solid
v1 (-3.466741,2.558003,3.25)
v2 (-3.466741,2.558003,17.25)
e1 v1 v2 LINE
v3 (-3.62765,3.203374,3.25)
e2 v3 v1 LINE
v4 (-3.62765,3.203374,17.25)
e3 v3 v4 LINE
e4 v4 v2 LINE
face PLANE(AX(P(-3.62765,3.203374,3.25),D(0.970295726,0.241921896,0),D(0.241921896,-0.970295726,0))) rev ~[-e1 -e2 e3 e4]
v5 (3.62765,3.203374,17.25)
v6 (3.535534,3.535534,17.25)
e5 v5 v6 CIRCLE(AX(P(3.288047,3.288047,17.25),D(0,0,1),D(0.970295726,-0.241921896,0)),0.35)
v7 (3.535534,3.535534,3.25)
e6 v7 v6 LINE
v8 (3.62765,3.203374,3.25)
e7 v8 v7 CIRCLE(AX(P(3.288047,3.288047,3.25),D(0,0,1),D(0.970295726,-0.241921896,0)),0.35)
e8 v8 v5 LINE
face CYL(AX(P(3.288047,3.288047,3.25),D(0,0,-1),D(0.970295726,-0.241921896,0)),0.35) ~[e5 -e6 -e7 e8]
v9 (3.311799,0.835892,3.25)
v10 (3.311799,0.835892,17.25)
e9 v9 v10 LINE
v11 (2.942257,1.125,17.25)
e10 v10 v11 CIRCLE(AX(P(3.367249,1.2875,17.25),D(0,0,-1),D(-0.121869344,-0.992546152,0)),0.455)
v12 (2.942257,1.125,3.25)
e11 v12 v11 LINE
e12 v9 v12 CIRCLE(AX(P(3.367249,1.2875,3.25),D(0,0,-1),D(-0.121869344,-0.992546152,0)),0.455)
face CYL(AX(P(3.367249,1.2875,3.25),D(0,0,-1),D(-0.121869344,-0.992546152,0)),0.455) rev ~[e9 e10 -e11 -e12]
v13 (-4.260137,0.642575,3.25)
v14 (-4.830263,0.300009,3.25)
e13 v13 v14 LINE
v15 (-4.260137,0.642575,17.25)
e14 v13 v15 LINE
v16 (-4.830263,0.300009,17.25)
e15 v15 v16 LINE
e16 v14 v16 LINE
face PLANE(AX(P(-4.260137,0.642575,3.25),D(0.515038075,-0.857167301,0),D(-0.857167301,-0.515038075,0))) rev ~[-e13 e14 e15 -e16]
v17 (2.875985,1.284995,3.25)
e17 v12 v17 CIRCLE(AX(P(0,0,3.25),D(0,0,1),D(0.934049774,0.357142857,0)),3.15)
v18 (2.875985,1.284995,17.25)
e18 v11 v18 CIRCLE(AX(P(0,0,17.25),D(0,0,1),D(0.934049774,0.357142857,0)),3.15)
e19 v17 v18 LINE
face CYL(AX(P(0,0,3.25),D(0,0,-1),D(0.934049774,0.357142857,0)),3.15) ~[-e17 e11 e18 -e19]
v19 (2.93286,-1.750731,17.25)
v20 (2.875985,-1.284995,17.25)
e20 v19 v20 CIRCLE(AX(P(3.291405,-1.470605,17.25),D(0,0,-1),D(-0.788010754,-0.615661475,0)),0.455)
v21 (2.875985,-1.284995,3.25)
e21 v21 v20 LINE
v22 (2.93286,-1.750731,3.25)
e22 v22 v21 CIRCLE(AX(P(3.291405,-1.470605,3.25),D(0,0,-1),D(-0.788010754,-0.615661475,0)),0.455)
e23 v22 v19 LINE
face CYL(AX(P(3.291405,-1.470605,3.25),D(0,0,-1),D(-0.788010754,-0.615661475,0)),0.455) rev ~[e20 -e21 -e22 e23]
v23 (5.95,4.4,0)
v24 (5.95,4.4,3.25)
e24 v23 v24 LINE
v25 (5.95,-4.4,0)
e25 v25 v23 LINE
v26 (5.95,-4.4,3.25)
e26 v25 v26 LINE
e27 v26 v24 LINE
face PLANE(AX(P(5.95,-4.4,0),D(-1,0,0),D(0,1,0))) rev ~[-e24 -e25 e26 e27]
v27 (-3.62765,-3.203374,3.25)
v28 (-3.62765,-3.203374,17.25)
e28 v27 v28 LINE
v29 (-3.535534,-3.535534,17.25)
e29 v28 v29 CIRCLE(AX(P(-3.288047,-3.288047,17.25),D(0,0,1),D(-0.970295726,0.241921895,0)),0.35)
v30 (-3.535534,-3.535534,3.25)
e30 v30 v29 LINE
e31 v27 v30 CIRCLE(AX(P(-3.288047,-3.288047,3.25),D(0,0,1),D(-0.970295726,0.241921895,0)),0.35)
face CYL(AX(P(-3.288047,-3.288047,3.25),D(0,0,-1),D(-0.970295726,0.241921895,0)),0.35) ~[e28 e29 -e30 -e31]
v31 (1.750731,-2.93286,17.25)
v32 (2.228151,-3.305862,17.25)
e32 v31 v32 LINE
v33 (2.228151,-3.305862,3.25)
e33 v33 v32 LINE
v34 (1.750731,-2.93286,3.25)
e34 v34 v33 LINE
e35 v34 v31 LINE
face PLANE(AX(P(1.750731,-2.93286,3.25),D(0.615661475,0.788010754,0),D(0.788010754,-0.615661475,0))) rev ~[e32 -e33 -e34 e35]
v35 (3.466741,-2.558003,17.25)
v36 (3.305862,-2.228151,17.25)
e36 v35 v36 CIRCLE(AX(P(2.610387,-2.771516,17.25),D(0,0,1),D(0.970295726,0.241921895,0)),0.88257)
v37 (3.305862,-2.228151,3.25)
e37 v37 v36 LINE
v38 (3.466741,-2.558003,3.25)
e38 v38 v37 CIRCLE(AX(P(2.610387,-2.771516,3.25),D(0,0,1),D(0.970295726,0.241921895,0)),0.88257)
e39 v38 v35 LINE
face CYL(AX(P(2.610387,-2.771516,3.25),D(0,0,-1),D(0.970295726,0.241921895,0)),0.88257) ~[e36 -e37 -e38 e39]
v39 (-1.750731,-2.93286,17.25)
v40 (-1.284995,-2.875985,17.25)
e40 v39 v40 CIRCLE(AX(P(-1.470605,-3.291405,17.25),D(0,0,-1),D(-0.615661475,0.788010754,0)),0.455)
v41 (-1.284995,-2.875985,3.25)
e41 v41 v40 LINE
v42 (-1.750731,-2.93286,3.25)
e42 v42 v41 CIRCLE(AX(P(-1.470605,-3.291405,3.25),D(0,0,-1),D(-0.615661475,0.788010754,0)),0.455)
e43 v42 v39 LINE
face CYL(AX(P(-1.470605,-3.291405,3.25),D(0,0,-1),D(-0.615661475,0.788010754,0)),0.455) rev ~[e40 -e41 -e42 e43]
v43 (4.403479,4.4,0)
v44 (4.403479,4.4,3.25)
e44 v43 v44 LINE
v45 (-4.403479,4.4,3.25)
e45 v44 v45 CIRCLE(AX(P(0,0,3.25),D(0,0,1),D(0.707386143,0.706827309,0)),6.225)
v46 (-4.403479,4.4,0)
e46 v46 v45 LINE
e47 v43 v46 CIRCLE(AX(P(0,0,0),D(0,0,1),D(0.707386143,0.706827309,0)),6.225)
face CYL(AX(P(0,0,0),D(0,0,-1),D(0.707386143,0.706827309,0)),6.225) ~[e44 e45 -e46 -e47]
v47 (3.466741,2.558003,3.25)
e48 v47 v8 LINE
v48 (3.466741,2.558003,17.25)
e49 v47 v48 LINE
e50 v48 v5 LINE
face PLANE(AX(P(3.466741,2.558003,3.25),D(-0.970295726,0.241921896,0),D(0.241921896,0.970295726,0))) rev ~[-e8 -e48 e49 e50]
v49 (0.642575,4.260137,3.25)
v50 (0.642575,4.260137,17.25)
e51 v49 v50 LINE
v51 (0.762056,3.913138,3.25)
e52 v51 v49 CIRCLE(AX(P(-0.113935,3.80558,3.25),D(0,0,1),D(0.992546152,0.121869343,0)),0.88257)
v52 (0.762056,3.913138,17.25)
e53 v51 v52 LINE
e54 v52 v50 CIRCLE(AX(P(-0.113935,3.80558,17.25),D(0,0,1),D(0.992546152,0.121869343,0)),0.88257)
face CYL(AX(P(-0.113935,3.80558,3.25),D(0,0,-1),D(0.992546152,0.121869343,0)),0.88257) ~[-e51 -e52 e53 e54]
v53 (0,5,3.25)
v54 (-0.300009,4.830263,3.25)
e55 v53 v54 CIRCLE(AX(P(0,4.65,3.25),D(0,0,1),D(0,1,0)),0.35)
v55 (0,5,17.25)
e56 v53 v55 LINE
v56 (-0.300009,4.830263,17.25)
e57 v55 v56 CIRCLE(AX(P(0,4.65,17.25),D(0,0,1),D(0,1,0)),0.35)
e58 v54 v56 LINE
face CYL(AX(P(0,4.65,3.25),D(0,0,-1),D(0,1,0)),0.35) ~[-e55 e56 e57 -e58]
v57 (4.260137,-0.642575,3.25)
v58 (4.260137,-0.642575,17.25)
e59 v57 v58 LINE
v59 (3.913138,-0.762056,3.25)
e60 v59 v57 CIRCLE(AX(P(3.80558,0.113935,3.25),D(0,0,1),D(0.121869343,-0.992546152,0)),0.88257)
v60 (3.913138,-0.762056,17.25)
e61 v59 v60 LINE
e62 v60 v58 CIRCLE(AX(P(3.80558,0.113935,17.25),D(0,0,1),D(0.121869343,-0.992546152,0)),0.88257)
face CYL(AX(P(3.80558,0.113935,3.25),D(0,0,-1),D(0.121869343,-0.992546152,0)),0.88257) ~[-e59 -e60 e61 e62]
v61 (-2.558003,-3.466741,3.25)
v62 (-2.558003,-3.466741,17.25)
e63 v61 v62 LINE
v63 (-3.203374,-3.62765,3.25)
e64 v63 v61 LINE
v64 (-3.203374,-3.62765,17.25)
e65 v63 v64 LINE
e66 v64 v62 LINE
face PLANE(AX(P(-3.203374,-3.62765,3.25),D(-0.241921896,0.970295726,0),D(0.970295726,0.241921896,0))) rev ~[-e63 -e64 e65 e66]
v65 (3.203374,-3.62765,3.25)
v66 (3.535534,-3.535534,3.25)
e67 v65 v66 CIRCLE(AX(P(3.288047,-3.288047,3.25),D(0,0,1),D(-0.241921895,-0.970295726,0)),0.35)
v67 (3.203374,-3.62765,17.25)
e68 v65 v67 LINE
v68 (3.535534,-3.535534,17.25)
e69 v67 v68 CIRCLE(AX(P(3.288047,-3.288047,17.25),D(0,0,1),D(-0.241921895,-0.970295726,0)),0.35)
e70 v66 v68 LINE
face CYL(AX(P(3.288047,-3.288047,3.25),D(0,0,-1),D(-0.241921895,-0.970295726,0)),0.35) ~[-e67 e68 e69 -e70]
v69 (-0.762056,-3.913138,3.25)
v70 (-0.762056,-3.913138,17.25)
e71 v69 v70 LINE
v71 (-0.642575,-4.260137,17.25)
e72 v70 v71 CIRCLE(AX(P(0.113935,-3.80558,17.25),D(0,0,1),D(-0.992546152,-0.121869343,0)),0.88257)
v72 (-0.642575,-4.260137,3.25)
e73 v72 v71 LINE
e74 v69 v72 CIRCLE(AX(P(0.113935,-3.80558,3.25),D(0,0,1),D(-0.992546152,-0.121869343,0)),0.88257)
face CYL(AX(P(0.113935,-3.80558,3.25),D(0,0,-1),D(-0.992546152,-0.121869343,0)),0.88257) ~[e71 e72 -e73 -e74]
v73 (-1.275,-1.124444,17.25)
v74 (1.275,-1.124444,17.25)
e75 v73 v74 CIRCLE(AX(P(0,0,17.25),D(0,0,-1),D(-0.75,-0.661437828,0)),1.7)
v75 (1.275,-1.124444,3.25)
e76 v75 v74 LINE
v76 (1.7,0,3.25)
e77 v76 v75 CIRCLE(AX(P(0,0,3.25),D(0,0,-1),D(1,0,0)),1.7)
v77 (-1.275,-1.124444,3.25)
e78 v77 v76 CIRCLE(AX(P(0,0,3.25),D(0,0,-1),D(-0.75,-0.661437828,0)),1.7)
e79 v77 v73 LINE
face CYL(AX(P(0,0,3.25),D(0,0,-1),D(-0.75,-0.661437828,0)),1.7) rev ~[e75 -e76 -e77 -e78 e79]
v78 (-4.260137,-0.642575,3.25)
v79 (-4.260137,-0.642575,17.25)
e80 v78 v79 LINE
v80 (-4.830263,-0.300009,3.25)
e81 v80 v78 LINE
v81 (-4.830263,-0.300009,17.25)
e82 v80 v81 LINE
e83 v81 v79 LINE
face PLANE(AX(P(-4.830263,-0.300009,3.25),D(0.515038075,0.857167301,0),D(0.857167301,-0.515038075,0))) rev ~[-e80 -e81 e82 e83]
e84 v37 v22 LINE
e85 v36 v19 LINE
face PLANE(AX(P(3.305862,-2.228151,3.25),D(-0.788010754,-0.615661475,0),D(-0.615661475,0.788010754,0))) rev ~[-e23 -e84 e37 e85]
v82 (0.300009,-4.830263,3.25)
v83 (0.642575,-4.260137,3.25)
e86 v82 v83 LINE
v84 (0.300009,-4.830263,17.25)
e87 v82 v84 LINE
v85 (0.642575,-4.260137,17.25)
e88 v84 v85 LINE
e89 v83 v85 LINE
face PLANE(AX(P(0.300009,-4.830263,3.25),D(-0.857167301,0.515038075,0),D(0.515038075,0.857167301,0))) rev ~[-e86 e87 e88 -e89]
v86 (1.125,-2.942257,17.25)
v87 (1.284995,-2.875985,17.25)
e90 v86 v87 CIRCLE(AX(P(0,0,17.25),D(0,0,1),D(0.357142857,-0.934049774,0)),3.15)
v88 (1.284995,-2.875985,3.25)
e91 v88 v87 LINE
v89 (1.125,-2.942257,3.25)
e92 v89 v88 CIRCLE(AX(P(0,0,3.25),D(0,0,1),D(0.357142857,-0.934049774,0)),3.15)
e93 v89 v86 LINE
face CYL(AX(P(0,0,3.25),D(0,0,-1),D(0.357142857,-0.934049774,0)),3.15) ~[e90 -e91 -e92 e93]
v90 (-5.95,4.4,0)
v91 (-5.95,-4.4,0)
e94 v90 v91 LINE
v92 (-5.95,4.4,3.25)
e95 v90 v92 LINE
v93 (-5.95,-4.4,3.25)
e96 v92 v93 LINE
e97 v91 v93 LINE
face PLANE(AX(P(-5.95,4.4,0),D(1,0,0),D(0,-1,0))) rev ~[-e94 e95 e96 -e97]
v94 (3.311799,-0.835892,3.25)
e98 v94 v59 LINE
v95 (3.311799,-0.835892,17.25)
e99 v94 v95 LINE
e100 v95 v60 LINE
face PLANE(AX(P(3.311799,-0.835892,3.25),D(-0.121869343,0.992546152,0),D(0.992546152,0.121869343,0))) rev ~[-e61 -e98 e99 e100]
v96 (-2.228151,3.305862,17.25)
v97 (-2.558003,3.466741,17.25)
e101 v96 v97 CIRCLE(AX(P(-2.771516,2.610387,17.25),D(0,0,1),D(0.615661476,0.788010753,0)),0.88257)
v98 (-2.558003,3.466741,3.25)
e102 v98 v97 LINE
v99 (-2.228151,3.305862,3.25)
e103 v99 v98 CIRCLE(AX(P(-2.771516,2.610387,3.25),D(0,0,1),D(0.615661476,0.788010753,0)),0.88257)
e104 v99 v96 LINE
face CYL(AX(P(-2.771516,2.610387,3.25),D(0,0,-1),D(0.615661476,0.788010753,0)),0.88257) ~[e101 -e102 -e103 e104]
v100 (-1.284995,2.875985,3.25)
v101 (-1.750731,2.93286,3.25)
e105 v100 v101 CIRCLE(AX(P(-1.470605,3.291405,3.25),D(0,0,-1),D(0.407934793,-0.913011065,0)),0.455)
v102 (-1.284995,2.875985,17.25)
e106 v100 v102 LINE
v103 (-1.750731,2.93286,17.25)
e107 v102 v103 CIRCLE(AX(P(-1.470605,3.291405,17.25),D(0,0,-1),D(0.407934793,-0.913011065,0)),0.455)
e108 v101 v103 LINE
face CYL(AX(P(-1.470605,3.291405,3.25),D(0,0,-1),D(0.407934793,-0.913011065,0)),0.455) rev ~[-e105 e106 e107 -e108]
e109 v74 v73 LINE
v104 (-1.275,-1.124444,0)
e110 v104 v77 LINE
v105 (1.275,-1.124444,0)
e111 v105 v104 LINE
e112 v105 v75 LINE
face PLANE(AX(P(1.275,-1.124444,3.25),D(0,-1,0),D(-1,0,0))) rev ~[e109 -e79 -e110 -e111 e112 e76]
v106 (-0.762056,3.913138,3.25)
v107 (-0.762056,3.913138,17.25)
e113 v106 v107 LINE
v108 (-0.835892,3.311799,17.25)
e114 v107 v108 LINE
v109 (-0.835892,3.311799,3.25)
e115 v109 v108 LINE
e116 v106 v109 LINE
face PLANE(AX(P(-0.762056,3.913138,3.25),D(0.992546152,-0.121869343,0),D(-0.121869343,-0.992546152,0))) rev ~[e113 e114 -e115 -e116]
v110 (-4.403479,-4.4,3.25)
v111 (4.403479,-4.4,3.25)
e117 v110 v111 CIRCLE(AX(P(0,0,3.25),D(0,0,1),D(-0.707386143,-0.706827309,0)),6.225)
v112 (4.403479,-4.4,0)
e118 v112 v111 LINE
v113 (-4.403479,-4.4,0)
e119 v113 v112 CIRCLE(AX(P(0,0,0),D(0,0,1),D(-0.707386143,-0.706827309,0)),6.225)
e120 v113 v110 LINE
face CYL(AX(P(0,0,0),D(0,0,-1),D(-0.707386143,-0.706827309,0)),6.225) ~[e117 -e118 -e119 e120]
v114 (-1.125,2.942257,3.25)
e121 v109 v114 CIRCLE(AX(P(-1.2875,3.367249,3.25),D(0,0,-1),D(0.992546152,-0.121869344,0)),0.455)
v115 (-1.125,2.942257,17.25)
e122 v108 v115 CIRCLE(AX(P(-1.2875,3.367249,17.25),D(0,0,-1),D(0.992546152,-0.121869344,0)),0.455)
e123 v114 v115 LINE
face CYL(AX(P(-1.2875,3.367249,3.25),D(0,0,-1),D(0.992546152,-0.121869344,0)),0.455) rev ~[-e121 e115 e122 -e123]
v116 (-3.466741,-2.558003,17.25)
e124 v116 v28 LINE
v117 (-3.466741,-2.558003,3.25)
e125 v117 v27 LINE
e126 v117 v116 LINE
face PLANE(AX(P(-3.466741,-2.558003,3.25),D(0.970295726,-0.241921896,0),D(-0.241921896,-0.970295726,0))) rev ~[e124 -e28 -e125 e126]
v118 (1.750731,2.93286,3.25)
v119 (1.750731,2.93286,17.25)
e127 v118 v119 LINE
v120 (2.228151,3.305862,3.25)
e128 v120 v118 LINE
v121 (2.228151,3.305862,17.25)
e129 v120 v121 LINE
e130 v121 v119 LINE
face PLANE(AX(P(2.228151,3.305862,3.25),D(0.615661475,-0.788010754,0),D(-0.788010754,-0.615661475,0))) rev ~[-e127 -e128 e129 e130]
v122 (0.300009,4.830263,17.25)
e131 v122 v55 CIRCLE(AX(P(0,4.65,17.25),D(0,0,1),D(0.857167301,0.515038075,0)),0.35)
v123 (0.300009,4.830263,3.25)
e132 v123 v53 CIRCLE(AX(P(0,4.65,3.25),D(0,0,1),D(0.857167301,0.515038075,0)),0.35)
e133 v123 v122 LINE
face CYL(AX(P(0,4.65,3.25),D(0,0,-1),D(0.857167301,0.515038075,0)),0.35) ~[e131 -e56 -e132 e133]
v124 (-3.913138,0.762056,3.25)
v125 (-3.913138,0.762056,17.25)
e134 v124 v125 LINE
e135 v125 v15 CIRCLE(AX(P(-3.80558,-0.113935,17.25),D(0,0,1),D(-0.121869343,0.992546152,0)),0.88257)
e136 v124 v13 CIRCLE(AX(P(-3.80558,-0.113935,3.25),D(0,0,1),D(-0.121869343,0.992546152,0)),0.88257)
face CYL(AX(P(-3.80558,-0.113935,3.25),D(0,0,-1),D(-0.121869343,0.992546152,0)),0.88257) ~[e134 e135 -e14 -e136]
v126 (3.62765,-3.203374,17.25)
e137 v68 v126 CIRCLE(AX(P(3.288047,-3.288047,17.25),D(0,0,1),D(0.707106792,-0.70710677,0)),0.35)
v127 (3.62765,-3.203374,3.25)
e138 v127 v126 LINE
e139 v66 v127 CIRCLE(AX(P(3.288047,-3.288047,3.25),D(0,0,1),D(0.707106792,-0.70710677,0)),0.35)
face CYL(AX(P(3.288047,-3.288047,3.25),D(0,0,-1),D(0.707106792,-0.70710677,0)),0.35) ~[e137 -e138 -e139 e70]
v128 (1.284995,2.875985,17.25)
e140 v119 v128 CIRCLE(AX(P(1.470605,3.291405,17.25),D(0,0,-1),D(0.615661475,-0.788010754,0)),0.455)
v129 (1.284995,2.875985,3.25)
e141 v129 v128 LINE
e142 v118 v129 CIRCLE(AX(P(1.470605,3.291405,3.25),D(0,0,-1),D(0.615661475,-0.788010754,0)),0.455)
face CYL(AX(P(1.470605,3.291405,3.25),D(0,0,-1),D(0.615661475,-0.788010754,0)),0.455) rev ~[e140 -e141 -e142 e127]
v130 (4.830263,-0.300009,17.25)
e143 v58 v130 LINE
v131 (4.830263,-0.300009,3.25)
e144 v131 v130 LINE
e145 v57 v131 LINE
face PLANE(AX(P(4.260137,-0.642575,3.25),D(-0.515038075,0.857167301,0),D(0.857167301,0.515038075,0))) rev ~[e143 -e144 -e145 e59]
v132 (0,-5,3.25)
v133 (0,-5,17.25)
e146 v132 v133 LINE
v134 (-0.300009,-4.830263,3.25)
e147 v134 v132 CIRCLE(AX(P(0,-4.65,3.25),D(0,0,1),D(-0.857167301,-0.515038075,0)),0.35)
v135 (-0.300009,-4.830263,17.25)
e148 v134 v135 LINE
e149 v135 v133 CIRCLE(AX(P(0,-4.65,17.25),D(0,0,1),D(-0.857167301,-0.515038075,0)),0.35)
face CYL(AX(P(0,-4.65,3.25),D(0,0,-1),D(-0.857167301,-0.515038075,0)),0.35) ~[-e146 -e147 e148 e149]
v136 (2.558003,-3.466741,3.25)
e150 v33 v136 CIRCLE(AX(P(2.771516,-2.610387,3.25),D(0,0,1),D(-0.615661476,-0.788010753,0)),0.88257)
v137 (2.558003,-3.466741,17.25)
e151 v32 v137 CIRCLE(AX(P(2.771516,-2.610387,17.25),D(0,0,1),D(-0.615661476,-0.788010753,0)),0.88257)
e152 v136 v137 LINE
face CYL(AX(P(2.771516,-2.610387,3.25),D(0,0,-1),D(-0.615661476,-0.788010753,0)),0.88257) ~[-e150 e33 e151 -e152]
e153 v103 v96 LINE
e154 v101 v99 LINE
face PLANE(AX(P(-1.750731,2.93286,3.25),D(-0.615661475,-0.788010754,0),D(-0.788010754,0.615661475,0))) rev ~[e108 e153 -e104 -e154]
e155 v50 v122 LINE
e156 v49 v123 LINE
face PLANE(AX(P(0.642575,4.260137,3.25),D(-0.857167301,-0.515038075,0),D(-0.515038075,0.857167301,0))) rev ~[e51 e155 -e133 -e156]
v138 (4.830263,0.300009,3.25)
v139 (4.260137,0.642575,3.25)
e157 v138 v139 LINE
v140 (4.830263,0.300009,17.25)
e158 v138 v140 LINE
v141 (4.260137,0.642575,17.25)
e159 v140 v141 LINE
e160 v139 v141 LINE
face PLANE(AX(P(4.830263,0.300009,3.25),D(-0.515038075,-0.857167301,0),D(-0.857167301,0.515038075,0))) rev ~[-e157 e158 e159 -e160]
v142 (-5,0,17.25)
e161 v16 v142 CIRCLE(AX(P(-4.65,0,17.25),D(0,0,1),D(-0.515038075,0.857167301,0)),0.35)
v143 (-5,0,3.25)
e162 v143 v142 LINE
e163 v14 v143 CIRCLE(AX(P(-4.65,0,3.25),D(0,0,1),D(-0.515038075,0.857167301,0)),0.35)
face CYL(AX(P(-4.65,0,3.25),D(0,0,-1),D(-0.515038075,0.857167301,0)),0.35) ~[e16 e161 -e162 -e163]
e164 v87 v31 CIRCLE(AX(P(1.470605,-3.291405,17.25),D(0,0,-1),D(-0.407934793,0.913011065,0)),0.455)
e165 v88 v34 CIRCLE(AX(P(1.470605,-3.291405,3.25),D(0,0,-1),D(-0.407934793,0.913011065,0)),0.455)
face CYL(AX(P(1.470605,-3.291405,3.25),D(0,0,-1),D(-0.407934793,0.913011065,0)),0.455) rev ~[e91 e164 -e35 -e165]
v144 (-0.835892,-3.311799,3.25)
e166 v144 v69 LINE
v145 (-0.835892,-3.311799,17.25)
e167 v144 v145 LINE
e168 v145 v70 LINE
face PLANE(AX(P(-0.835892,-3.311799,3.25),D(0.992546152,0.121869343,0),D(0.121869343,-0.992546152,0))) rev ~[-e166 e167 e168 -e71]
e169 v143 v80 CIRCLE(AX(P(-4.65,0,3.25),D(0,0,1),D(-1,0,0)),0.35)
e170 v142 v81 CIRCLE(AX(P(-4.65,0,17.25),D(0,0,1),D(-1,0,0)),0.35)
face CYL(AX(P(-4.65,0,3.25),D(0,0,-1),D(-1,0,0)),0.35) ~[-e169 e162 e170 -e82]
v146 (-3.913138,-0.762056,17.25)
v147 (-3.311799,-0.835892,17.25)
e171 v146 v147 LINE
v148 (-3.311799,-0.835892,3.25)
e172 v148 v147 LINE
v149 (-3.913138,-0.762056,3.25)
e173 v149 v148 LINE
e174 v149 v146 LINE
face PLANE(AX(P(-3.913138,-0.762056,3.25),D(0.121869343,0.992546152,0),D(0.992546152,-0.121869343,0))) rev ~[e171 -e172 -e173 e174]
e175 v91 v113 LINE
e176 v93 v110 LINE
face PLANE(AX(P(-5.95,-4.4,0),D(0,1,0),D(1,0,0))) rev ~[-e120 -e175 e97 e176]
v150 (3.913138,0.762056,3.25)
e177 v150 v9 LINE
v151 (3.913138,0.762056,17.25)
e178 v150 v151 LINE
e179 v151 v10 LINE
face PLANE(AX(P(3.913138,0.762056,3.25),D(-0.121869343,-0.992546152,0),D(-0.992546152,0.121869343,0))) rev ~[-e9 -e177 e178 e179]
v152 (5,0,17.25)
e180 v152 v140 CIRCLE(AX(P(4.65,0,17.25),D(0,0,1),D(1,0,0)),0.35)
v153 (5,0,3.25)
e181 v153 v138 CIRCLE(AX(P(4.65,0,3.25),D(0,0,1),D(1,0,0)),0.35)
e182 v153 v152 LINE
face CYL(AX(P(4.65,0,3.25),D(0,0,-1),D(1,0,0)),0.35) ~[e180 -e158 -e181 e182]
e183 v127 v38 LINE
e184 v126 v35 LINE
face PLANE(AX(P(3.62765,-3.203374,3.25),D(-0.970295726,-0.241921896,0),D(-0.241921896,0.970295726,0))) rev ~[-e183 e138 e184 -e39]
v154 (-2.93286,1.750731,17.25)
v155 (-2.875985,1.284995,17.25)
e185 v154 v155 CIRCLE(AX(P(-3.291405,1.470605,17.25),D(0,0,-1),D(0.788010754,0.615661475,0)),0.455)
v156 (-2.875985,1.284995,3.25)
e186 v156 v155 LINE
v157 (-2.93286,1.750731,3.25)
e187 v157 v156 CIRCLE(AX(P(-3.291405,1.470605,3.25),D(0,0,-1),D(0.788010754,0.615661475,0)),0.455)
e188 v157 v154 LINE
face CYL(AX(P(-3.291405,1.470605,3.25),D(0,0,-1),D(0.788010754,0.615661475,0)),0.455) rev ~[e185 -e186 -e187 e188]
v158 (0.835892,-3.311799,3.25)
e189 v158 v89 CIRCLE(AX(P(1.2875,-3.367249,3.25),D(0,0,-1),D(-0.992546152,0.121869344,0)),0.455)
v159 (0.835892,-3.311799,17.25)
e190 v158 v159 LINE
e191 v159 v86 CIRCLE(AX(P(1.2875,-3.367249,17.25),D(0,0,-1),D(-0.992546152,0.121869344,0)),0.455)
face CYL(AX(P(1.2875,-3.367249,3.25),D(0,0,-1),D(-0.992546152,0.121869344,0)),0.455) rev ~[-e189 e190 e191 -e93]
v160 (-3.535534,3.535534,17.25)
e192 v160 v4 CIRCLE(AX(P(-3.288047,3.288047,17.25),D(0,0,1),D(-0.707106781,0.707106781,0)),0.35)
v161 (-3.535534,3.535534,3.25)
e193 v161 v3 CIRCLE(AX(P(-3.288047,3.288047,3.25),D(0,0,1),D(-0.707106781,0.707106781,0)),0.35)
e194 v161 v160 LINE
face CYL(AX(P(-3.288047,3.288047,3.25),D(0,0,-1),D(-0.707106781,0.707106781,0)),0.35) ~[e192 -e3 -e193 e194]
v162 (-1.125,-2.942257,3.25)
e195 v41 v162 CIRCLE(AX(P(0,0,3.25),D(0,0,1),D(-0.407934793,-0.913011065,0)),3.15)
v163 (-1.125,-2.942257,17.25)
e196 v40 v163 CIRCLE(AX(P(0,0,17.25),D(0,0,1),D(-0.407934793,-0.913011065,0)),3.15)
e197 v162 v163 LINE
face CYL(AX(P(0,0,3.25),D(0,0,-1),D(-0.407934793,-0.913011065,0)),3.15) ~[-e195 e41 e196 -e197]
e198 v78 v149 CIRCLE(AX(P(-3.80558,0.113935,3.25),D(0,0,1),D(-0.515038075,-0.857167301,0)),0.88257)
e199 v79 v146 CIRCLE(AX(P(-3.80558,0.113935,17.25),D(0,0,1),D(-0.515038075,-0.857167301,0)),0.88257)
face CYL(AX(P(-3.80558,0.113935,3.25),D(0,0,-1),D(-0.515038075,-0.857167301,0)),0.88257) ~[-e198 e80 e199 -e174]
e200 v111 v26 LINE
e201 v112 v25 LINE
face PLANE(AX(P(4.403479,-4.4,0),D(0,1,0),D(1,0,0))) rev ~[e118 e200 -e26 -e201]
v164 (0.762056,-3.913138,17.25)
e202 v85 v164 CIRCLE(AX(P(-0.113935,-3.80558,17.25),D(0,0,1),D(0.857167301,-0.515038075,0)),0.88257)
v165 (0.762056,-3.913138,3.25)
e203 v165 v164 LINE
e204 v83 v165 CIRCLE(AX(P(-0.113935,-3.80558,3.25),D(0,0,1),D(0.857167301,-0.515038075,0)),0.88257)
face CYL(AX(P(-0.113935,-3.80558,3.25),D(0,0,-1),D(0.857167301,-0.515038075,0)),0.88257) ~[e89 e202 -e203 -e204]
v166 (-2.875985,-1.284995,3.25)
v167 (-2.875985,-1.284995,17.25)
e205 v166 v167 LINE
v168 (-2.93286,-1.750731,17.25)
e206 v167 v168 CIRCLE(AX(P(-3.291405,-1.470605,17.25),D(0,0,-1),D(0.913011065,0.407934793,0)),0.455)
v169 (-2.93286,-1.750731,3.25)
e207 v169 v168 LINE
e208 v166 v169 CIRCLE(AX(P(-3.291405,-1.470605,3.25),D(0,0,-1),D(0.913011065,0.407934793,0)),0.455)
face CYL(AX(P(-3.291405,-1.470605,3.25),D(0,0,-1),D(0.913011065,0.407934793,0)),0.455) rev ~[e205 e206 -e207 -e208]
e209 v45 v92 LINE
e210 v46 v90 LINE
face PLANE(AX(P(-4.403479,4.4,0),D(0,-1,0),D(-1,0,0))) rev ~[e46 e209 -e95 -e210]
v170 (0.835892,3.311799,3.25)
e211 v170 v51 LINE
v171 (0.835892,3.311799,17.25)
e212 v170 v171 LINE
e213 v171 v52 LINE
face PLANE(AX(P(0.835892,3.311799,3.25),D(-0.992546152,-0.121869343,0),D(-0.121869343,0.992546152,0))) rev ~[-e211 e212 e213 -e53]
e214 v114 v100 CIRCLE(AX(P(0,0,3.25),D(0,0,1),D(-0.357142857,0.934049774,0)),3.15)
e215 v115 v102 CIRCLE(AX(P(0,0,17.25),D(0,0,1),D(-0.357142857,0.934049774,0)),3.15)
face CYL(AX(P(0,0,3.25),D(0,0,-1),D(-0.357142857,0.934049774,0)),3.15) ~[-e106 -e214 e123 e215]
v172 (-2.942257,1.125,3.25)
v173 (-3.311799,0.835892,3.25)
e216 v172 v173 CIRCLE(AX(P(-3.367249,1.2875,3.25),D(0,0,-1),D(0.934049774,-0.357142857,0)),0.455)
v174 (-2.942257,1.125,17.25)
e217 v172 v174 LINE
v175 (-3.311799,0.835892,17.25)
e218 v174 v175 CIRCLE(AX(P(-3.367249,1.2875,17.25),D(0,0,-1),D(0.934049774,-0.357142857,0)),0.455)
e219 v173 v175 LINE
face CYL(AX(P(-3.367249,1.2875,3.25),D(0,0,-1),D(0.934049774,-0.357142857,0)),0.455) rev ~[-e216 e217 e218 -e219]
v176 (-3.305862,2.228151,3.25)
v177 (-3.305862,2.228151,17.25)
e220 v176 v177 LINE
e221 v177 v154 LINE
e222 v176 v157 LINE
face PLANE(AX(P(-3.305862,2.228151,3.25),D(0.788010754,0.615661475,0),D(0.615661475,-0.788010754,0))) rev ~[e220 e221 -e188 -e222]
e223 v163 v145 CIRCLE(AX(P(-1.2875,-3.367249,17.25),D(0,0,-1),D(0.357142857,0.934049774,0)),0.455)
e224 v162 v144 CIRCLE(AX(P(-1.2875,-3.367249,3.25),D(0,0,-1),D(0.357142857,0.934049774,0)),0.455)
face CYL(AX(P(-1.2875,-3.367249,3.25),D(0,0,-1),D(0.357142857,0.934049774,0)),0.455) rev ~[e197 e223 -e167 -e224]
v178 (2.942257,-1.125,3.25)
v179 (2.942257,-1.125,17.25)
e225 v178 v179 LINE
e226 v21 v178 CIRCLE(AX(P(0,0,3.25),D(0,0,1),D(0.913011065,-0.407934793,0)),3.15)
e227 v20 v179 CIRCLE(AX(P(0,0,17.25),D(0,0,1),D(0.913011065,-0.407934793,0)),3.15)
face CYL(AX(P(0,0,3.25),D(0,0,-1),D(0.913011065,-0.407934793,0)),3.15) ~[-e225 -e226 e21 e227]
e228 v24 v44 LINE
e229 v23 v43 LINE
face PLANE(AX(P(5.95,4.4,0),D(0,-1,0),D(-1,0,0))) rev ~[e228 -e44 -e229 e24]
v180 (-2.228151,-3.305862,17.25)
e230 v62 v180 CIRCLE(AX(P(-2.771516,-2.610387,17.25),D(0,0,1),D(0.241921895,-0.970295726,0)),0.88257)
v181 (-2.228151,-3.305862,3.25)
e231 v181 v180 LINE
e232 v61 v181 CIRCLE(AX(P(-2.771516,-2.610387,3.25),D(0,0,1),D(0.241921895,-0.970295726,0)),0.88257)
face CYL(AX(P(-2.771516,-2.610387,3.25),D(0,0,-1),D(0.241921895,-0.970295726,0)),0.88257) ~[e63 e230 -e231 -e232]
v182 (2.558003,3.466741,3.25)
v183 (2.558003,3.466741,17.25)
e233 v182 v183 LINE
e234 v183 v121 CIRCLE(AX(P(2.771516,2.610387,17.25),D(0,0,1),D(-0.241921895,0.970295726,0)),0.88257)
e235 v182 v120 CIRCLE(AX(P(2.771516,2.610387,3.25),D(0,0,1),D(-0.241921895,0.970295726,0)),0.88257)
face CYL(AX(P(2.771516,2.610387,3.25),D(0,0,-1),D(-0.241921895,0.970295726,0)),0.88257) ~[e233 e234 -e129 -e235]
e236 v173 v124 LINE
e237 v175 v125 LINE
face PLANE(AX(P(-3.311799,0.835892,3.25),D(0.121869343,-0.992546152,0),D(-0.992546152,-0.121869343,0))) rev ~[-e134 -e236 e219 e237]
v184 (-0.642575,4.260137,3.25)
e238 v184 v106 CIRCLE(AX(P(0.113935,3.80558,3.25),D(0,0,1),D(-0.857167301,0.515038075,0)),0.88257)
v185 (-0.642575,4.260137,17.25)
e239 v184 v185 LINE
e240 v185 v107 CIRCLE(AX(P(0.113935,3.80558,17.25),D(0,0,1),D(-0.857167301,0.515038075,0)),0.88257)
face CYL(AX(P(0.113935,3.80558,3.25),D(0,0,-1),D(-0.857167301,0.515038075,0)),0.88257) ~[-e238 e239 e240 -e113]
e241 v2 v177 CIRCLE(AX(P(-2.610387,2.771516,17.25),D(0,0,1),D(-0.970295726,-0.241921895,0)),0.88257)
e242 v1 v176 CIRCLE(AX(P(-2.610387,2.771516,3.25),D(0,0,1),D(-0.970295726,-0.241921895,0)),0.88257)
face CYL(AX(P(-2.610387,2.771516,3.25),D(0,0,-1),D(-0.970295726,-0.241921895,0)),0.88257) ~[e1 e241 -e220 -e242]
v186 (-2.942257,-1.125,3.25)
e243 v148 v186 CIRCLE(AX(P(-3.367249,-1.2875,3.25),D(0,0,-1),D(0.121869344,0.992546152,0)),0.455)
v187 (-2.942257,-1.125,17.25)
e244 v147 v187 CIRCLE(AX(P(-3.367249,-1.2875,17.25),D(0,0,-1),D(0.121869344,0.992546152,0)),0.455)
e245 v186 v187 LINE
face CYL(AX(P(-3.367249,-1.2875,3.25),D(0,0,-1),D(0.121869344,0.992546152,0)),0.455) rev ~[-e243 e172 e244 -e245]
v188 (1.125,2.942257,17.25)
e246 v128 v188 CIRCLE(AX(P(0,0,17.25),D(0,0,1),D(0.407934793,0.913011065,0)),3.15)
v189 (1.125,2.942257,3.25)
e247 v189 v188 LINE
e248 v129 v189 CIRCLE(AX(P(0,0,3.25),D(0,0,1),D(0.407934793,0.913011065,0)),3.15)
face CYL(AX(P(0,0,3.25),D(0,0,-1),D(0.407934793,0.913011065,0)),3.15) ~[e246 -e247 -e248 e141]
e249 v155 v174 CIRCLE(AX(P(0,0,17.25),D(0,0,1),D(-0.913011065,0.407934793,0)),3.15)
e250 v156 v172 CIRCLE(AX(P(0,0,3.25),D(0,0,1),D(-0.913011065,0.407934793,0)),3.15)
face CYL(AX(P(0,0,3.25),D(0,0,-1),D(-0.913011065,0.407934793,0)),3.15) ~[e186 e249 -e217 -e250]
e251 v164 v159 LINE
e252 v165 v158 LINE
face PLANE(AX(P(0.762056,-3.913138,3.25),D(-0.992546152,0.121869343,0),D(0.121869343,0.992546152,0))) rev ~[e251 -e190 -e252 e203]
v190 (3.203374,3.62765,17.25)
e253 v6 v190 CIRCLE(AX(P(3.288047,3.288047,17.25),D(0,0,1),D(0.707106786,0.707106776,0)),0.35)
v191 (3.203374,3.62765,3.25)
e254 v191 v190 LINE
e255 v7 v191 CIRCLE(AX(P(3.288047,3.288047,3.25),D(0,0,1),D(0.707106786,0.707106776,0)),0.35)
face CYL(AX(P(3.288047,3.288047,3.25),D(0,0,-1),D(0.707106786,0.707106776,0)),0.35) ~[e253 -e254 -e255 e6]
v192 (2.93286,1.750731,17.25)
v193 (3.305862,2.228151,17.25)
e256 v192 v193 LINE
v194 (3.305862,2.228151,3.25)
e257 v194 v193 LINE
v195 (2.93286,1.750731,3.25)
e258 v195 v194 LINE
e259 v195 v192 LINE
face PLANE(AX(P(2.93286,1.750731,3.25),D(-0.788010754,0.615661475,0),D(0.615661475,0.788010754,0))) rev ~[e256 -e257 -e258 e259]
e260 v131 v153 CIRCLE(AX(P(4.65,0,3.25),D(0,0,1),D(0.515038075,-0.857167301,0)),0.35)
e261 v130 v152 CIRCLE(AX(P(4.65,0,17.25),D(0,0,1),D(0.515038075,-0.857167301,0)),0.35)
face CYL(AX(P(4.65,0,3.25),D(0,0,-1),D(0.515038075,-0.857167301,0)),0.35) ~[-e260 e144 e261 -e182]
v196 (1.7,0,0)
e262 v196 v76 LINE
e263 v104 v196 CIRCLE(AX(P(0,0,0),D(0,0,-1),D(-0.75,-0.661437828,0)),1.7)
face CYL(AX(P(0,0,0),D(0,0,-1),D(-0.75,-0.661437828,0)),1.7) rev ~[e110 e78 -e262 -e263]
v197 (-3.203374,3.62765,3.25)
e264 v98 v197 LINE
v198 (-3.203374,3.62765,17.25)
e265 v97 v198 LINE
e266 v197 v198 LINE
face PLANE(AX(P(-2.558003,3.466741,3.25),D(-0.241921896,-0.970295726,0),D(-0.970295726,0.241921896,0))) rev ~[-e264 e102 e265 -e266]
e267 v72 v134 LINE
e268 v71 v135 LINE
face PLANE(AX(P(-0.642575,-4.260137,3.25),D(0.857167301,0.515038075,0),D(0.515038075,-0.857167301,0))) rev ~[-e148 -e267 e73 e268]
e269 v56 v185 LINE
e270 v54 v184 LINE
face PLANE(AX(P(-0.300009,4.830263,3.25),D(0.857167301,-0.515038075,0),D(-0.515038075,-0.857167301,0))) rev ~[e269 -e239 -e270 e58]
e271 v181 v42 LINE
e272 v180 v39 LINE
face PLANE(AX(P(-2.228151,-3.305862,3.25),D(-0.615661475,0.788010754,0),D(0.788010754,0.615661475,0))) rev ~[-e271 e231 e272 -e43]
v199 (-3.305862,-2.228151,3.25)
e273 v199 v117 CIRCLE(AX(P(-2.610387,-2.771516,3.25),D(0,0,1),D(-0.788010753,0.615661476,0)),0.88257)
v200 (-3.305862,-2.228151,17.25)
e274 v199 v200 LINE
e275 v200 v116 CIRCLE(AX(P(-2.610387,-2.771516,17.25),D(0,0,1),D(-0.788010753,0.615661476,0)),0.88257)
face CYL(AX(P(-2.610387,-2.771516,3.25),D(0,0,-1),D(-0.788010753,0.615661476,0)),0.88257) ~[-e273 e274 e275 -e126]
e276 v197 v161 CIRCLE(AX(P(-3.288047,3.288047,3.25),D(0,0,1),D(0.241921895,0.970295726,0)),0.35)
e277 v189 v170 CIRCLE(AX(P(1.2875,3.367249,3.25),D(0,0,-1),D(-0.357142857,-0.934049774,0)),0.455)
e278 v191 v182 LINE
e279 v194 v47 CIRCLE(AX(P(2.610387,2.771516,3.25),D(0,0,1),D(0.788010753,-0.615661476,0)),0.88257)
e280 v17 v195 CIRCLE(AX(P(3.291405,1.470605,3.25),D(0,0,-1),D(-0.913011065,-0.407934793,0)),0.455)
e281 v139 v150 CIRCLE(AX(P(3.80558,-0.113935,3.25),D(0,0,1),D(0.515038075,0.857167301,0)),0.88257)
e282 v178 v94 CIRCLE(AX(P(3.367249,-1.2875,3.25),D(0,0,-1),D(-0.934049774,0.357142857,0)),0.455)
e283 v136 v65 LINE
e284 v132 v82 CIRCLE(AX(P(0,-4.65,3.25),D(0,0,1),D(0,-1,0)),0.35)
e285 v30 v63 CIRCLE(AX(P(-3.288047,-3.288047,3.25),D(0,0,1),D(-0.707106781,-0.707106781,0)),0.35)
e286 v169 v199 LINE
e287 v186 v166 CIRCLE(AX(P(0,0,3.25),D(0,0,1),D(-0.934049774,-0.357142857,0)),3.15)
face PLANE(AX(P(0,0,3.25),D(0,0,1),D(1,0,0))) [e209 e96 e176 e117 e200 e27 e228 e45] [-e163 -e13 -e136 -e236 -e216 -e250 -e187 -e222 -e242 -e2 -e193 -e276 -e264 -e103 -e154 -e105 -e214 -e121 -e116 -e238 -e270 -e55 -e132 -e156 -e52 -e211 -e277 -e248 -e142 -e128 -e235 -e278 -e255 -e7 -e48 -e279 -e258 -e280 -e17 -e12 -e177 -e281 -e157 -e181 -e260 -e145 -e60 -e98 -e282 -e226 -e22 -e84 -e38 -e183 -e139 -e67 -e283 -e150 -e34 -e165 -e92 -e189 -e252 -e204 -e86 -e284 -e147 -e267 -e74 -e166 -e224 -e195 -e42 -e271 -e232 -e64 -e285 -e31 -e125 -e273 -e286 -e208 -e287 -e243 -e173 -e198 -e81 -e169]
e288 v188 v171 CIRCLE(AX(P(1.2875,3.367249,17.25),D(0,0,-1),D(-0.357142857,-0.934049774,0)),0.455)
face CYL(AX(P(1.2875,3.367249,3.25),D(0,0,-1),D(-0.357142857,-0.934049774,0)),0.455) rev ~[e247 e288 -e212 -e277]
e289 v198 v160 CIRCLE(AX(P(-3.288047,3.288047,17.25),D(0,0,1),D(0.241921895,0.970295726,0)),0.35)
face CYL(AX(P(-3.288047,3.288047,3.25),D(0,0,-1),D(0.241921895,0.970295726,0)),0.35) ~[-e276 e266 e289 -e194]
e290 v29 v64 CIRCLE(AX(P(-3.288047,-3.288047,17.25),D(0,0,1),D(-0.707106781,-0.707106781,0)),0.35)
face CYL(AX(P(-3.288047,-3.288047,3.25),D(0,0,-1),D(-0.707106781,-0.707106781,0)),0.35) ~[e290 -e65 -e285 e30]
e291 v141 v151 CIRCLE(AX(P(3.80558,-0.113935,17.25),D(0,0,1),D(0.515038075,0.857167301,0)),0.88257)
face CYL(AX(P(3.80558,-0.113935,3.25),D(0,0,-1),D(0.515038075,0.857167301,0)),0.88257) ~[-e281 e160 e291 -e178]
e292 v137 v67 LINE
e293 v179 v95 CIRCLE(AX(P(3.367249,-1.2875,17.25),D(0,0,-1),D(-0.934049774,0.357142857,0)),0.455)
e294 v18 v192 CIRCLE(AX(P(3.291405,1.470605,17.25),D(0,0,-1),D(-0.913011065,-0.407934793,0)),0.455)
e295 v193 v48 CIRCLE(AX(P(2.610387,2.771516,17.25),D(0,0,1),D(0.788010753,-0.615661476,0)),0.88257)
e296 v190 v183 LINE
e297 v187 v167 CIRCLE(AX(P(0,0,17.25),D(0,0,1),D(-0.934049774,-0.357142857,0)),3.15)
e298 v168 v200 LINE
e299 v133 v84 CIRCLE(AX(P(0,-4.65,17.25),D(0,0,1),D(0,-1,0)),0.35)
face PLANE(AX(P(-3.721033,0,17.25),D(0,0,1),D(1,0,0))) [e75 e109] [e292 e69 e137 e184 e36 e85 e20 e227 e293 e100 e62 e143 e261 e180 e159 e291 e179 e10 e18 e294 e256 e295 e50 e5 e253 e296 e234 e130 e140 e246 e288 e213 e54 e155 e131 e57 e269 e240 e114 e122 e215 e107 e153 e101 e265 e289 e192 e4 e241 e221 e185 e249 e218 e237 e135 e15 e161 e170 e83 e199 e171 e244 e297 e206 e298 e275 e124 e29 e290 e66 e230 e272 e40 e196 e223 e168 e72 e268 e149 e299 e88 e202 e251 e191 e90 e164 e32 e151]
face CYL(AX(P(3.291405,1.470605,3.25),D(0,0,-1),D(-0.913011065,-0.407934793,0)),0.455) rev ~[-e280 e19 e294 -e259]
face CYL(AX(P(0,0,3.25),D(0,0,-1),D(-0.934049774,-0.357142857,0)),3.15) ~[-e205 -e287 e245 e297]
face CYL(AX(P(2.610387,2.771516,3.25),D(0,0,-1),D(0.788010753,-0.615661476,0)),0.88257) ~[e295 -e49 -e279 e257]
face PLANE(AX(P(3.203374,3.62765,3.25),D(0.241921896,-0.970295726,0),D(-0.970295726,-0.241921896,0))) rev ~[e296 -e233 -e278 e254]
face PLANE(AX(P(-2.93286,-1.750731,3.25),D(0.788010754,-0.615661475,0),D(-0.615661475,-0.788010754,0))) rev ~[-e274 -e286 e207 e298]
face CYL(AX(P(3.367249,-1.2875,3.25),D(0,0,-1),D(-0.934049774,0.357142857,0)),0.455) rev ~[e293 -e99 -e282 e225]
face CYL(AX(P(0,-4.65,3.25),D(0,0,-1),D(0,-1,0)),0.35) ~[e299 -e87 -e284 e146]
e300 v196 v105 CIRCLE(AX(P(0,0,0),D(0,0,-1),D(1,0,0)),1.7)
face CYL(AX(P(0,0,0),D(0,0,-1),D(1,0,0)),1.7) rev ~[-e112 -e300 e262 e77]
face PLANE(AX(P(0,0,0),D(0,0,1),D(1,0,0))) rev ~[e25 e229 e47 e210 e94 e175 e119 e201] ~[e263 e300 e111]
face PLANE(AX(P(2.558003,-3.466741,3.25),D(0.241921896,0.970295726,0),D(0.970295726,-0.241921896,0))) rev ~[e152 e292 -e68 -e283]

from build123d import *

# Parameters (mm, degrees)
F0_R     = 5
F0_R_2   = 3.15
F0_R_3   = 2.55
F1_DEPTH = 3.25
F2_R     = 2.55
F3_DEPTH = 14


# Not quite as in the source:
# - a feature names something its author has since deleted; it is built from what else it names


with BuildPart() as f1:
    # F0 (on Top) → F1 (new body)
    with BuildSketch(Plane.XY):
        with BuildLine():
            Line((-5.95, -4.4), (-4.4034787385, -4.4))
            ThreePointArc((-4.4034787385, -4.4), (0, -6.225), (4.4034787385, -4.4))
            Line((4.4034787385, -4.4), (5.95, -4.4))
            Line((5.95, -4.4), (5.95, 4.4))
            Line((5.95, 4.4), (4.4034787385, 4.4))
            ThreePointArc((4.4034787385, 4.4), (0, 6.225), (-4.4034787385, 4.4))
            Line((-4.4034787385, 4.4), (-5.95, 4.4))
            Line((-5.95, 4.4), (-5.95, -4.4))
        make_face()
        Circle(F0_R, mode=Mode.SUBTRACT)
        Circle(F0_R)
        Circle(F0_R_2, mode=Mode.SUBTRACT)
        Circle(F0_R_2)
        Circle(F0_R_3, mode=Mode.SUBTRACT)
        Circle(F0_R_3)
        with BuildLine():
            ThreePointArc((-1.275, -1.1244443072), (-0.601040764, 1.5902043894), (1.7, 0))
            ThreePointArc((1.7, 0), (1.5902043894, -0.601040764), (1.275, -1.1244443072))
            ThreePointArc((1.275, -1.1244443072), (0, -1.7), (-1.275, -1.1244443072))
        make_face(mode=Mode.SUBTRACT)
        with BuildLine():
            Line((1.275, -1.1244443072), (-1.275, -1.1244443072))
            ThreePointArc((-1.275, -1.1244443072), (0, -1.7), (1.275, -1.1244443072))
        make_face()
    extrude(amount=F1_DEPTH)

    # F2 (on face) → F3 (join)
    with BuildSketch(Plane.XY.offset(3.25)):
        with BuildLine():
            ThreePointArc((-4.8302633262, 0.3000085552), (-4.9546244936, 0.172348246), (-5, 0))
            ThreePointArc((-5, 0), (-4.9546244936, -0.172348246), (-4.8302633262, -0.3000085552))
            Line((-4.8302633262, -0.3000085552), (-4.2601369618, -0.6425750355))
            ThreePointArc((-4.2601369618, -0.6425750355), (-4.0929165173, -0.7205512094), (-3.9131380826, -0.7620563314))
            Line((-3.9131380826, -0.7620563314), (-3.3117988826, -0.835891501))
            ThreePointArc((-3.3117988826, -0.835891501), (-3.0868883315, -0.9291389359), (-2.9422567869, -1.125))
            ThreePointArc((-2.9422567869, -1.125), (-3.15, 0), (-2.9422567869, 1.125))
            ThreePointArc((-2.9422567869, 1.125), (-3.0868883315, 0.9291389359), (-3.3117988826, 0.835891501))
            Line((-3.3117988826, 0.835891501), (-3.9131380826, 0.7620563314))
            ThreePointArc((-3.9131380826, 0.7620563314), (-4.0929165173, 0.7205512094), (-4.2601369618, 0.6425750355))
            Line((-4.2601369618, 0.6425750355), (-4.8302633262, 0.3000085552))
        make_face()
        with BuildLine():
            ThreePointArc((-3.2033738691, 3.6276500367), (-3.3815799641, 3.6253171911), (-3.5355339059, 3.5355339059))
            ThreePointArc((-3.5355339059, 3.5355339059), (-3.6253171911, 3.3815799641), (-3.6276500367, 3.2033738691))
            Line((-3.6276500367, 3.2033738691), (-3.4667408995, 2.5580025694))
            ThreePointArc((-3.4667408995, 2.5580025694), (-3.4036356706, 2.3846223779), (-3.3058616735, 2.2281512744))
            Line((-3.3058616735, 2.2281512744), (-2.9328599965, 1.7507308991))
            ThreePointArc((-2.9328599965, 1.7507308991), (-2.8397601142, 1.5257592297), (-2.8759848548, 1.2849945972))
            ThreePointArc((-2.8759848548, 1.2849945972), (-2.2273863607, 2.2273863607), (-1.2849945972, 2.8759848548))
            ThreePointArc((-1.2849945972, 2.8759848548), (-1.5257592297, 2.8397601142), (-1.7507308991, 2.9328599965))
            Line((-1.7507308991, 2.9328599965), (-2.2281512744, 3.3058616735))
            ThreePointArc((-2.2281512744, 3.3058616735), (-2.3846223779, 3.4036356706), (-2.5580025694, 3.4667408995))
            Line((-2.5580025694, 3.4667408995), (-3.2033738691, 3.6276500367))
        make_face()
        with BuildLine():
            ThreePointArc((0.3000085552, 4.8302633262), (0.172348246, 4.9546244936), (0, 5))
            ThreePointArc((0, 5), (-0.172348246, 4.9546244936), (-0.3000085552, 4.8302633262))
            Line((-0.3000085552, 4.8302633262), (-0.6425750355, 4.2601369618))
            ThreePointArc((-0.6425750355, 4.2601369618), (-0.7205512094, 4.0929165173), (-0.7620563314, 3.9131380826))
            Line((-0.7620563314, 3.9131380826), (-0.835891501, 3.3117988826))
            ThreePointArc((-0.835891501, 3.3117988826), (-0.9291389359, 3.0868883315), (-1.125, 2.9422567869))
            ThreePointArc((-1.125, 2.9422567869), (0, 3.15), (1.125, 2.9422567869))
            ThreePointArc((1.125, 2.9422567869), (0.9291389359, 3.0868883315), (0.835891501, 3.3117988826))
            Line((0.835891501, 3.3117988826), (0.7620563314, 3.9131380826))
            ThreePointArc((0.7620563314, 3.9131380826), (0.7205512094, 4.0929165173), (0.6425750355, 4.2601369618))
            Line((0.6425750355, 4.2601369618), (0.3000085552, 4.8302633262))
        make_face()
        with BuildLine():
            ThreePointArc((3.2033738691, -3.6276500367), (3.3815799667, -3.6253171904), (3.5355339096, -3.5355339023))
            ThreePointArc((3.5355339096, -3.5355339023), (3.6253171918, -3.3815799616), (3.6276500367, -3.2033738691))
            Line((3.6276500367, -3.2033738691), (3.4667408995, -2.5580025694))
            ThreePointArc((3.4667408995, -2.5580025694), (3.4036356706, -2.3846223779), (3.3058616735, -2.2281512744))
            Line((3.3058616735, -2.2281512744), (2.9328599965, -1.7507308991))
            ThreePointArc((2.9328599965, -1.7507308991), (2.8397601142, -1.5257592297), (2.8759848548, -1.2849945972))
            ThreePointArc((2.8759848548, -1.2849945972), (2.2273863607, -2.2273863607), (1.2849945972, -2.8759848548))
            ThreePointArc((1.2849945972, -2.8759848548), (1.5257592297, -2.8397601142), (1.7507308991, -2.9328599965))
            Line((1.7507308991, -2.9328599965), (2.2281512744, -3.3058616735))
            ThreePointArc((2.2281512744, -3.3058616735), (2.3846223779, -3.4036356706), (2.5580025694, -3.4667408995))
            Line((2.5580025694, -3.4667408995), (3.2033738691, -3.6276500367))
        make_face()
        with BuildLine():
            ThreePointArc((-0.3000085552, -4.8302633262), (-0.172348246, -4.9546244936), (0, -5))
            ThreePointArc((0, -5), (0.172348246, -4.9546244936), (0.3000085552, -4.8302633262))
            Line((0.3000085552, -4.8302633262), (0.6425750355, -4.2601369618))
            ThreePointArc((0.6425750355, -4.2601369618), (0.7205512094, -4.0929165173), (0.7620563314, -3.9131380826))
            Line((0.7620563314, -3.9131380826), (0.835891501, -3.3117988826))
            ThreePointArc((0.835891501, -3.3117988826), (0.9291389359, -3.0868883315), (1.125, -2.9422567869))
            ThreePointArc((1.125, -2.9422567869), (0, -3.15), (-1.125, -2.9422567869))
            ThreePointArc((-1.125, -2.9422567869), (-0.9291389359, -3.0868883315), (-0.835891501, -3.3117988826))
            Line((-0.835891501, -3.3117988826), (-0.7620563314, -3.9131380826))
            ThreePointArc((-0.7620563314, -3.9131380826), (-0.7205512094, -4.0929165173), (-0.6425750355, -4.2601369618))
            Line((-0.6425750355, -4.2601369618), (-0.3000085552, -4.8302633262))
        make_face()
        with BuildLine():
            ThreePointArc((-3.6276500367, -3.2033738691), (-3.6253171911, -3.3815799641), (-3.5355339059, -3.5355339059))
            ThreePointArc((-3.5355339059, -3.5355339059), (-3.3815799641, -3.6253171911), (-3.2033738691, -3.6276500367))
            Line((-3.2033738691, -3.6276500367), (-2.5580025694, -3.4667408995))
            ThreePointArc((-2.5580025694, -3.4667408995), (-2.3846223779, -3.4036356706), (-2.2281512744, -3.3058616735))
            Line((-2.2281512744, -3.3058616735), (-1.7507308991, -2.9328599965))
            ThreePointArc((-1.7507308991, -2.9328599965), (-1.5257592297, -2.8397601142), (-1.2849945972, -2.8759848548))
            ThreePointArc((-1.2849945972, -2.8759848548), (-2.2273863607, -2.2273863607), (-2.8759848548, -1.2849945972))
            ThreePointArc((-2.8759848548, -1.2849945972), (-2.8397601142, -1.5257592297), (-2.9328599965, -1.7507308991))
            Line((-2.9328599965, -1.7507308991), (-3.3058616735, -2.2281512744))
            ThreePointArc((-3.3058616735, -2.2281512744), (-3.4036356706, -2.3846223779), (-3.4667408995, -2.5580025694))
            Line((-3.4667408995, -2.5580025694), (-3.6276500367, -3.2033738691))
        make_face()
        with BuildLine():
            ThreePointArc((2.8759848548, -1.2849945972), (2.9102205274, -1.205452812), (2.9422567869, -1.125))
            ThreePointArc((2.9422567869, -1.125), (3.0976288414, -0.5720101054), (3.15, 0))
            ThreePointArc((3.15, 0), (3.0976288414, 0.5720101054), (2.9422567869, 1.125))
            ThreePointArc((2.9422567869, 1.125), (2.9102205274, 1.205452812), (2.8759848548, 1.2849945972))
            ThreePointArc((2.8759848548, 1.2849945972), (2.2273863607, 2.2273863607), (1.2849945972, 2.8759848548))
            ThreePointArc((1.2849945972, 2.8759848548), (1.205452812, 2.9102205274), (1.125, 2.9422567869))
            ThreePointArc((1.125, 2.9422567869), (0, 3.15), (-1.125, 2.9422567869))
            ThreePointArc((-1.125, 2.9422567869), (-1.205452812, 2.9102205274), (-1.2849945972, 2.8759848548))
            ThreePointArc((-1.2849945972, 2.8759848548), (-2.2273863607, 2.2273863607), (-2.8759848548, 1.2849945972))
            ThreePointArc((-2.8759848548, 1.2849945972), (-2.9102205274, 1.205452812), (-2.9422567869, 1.125))
            ThreePointArc((-2.9422567869, 1.125), (-3.15, 0), (-2.9422567869, -1.125))
            ThreePointArc((-2.9422567869, -1.125), (-2.9102205274, -1.205452812), (-2.8759848548, -1.2849945972))
            ThreePointArc((-2.8759848548, -1.2849945972), (-2.2273863607, -2.2273863607), (-1.2849945972, -2.8759848548))
            ThreePointArc((-1.2849945972, -2.8759848548), (-1.205452812, -2.9102205274), (-1.125, -2.9422567869))
            ThreePointArc((-1.125, -2.9422567869), (0, -3.15), (1.125, -2.9422567869))
            ThreePointArc((1.125, -2.9422567869), (1.205452812, -2.9102205274), (1.2849945972, -2.8759848548))
            ThreePointArc((1.2849945972, -2.8759848548), (2.2273863607, -2.2273863607), (2.8759848548, -1.2849945972))
        make_face()
        Circle(F2_R, mode=Mode.SUBTRACT)
        Circle(F2_R)
        with BuildLine():
            Line((1.275, -1.1244443072), (-1.275, -1.1244443072))
            ThreePointArc((-1.275, -1.1244443072), (0, 1.7), (1.275, -1.1244443072))
        make_face(mode=Mode.SUBTRACT)
        with BuildLine():
            ThreePointArc((3.6276500367, 3.2033738691), (3.6253171915, 3.3815799629), (3.5355339078, 3.5355339041))
            ThreePointArc((3.5355339078, 3.5355339041), (3.3815799654, 3.6253171908), (3.2033738691, 3.6276500367))
            Line((3.2033738691, 3.6276500367), (2.5580025694, 3.4667408995))
            ThreePointArc((2.5580025694, 3.4667408995), (2.3846223779, 3.4036356706), (2.2281512744, 3.3058616735))
            Line((2.2281512744, 3.3058616735), (1.7507308991, 2.9328599965))
            ThreePointArc((1.7507308991, 2.9328599965), (1.5257592297, 2.8397601142), (1.2849945972, 2.8759848548))
            ThreePointArc((1.2849945972, 2.8759848548), (2.2273863607, 2.2273863607), (2.8759848548, 1.2849945972))
            ThreePointArc((2.8759848548, 1.2849945972), (2.8397601142, 1.5257592297), (2.9328599965, 1.7507308991))
            Line((2.9328599965, 1.7507308991), (3.3058616735, 2.2281512744))
            ThreePointArc((3.3058616735, 2.2281512744), (3.4036356706, 2.3846223779), (3.4667408995, 2.5580025694))
            Line((3.4667408995, 2.5580025694), (3.6276500367, 3.2033738691))
        make_face()
        with BuildLine():
            ThreePointArc((4.8302633262, -0.3000085552), (4.9546244936, -0.172348246), (5, 0))
            ThreePointArc((5, 0), (4.9546244936, 0.172348246), (4.8302633262, 0.3000085552))
            Line((4.8302633262, 0.3000085552), (4.2601369618, 0.6425750355))
            ThreePointArc((4.2601369618, 0.6425750355), (4.0929165173, 0.7205512094), (3.9131380826, 0.7620563314))
            Line((3.9131380826, 0.7620563314), (3.3117988826, 0.835891501))
            ThreePointArc((3.3117988826, 0.835891501), (3.0868883315, 0.9291389359), (2.9422567869, 1.125))
            ThreePointArc((2.9422567869, 1.125), (3.0976288414, 0.5720101054), (3.15, 0))
            ThreePointArc((3.15, 0), (3.0976288414, -0.5720101054), (2.9422567869, -1.125))
            ThreePointArc((2.9422567869, -1.125), (3.0868883315, -0.9291389359), (3.3117988826, -0.835891501))
            Line((3.3117988826, -0.835891501), (3.9131380826, -0.7620563314))
            ThreePointArc((3.9131380826, -0.7620563314), (4.0929165173, -0.7205512094), (4.2601369618, -0.6425750355))
            Line((4.2601369618, -0.6425750355), (4.8302633262, -0.3000085552))
        make_face()
    extrude(amount=F3_DEPTH)


solid = f1.part
